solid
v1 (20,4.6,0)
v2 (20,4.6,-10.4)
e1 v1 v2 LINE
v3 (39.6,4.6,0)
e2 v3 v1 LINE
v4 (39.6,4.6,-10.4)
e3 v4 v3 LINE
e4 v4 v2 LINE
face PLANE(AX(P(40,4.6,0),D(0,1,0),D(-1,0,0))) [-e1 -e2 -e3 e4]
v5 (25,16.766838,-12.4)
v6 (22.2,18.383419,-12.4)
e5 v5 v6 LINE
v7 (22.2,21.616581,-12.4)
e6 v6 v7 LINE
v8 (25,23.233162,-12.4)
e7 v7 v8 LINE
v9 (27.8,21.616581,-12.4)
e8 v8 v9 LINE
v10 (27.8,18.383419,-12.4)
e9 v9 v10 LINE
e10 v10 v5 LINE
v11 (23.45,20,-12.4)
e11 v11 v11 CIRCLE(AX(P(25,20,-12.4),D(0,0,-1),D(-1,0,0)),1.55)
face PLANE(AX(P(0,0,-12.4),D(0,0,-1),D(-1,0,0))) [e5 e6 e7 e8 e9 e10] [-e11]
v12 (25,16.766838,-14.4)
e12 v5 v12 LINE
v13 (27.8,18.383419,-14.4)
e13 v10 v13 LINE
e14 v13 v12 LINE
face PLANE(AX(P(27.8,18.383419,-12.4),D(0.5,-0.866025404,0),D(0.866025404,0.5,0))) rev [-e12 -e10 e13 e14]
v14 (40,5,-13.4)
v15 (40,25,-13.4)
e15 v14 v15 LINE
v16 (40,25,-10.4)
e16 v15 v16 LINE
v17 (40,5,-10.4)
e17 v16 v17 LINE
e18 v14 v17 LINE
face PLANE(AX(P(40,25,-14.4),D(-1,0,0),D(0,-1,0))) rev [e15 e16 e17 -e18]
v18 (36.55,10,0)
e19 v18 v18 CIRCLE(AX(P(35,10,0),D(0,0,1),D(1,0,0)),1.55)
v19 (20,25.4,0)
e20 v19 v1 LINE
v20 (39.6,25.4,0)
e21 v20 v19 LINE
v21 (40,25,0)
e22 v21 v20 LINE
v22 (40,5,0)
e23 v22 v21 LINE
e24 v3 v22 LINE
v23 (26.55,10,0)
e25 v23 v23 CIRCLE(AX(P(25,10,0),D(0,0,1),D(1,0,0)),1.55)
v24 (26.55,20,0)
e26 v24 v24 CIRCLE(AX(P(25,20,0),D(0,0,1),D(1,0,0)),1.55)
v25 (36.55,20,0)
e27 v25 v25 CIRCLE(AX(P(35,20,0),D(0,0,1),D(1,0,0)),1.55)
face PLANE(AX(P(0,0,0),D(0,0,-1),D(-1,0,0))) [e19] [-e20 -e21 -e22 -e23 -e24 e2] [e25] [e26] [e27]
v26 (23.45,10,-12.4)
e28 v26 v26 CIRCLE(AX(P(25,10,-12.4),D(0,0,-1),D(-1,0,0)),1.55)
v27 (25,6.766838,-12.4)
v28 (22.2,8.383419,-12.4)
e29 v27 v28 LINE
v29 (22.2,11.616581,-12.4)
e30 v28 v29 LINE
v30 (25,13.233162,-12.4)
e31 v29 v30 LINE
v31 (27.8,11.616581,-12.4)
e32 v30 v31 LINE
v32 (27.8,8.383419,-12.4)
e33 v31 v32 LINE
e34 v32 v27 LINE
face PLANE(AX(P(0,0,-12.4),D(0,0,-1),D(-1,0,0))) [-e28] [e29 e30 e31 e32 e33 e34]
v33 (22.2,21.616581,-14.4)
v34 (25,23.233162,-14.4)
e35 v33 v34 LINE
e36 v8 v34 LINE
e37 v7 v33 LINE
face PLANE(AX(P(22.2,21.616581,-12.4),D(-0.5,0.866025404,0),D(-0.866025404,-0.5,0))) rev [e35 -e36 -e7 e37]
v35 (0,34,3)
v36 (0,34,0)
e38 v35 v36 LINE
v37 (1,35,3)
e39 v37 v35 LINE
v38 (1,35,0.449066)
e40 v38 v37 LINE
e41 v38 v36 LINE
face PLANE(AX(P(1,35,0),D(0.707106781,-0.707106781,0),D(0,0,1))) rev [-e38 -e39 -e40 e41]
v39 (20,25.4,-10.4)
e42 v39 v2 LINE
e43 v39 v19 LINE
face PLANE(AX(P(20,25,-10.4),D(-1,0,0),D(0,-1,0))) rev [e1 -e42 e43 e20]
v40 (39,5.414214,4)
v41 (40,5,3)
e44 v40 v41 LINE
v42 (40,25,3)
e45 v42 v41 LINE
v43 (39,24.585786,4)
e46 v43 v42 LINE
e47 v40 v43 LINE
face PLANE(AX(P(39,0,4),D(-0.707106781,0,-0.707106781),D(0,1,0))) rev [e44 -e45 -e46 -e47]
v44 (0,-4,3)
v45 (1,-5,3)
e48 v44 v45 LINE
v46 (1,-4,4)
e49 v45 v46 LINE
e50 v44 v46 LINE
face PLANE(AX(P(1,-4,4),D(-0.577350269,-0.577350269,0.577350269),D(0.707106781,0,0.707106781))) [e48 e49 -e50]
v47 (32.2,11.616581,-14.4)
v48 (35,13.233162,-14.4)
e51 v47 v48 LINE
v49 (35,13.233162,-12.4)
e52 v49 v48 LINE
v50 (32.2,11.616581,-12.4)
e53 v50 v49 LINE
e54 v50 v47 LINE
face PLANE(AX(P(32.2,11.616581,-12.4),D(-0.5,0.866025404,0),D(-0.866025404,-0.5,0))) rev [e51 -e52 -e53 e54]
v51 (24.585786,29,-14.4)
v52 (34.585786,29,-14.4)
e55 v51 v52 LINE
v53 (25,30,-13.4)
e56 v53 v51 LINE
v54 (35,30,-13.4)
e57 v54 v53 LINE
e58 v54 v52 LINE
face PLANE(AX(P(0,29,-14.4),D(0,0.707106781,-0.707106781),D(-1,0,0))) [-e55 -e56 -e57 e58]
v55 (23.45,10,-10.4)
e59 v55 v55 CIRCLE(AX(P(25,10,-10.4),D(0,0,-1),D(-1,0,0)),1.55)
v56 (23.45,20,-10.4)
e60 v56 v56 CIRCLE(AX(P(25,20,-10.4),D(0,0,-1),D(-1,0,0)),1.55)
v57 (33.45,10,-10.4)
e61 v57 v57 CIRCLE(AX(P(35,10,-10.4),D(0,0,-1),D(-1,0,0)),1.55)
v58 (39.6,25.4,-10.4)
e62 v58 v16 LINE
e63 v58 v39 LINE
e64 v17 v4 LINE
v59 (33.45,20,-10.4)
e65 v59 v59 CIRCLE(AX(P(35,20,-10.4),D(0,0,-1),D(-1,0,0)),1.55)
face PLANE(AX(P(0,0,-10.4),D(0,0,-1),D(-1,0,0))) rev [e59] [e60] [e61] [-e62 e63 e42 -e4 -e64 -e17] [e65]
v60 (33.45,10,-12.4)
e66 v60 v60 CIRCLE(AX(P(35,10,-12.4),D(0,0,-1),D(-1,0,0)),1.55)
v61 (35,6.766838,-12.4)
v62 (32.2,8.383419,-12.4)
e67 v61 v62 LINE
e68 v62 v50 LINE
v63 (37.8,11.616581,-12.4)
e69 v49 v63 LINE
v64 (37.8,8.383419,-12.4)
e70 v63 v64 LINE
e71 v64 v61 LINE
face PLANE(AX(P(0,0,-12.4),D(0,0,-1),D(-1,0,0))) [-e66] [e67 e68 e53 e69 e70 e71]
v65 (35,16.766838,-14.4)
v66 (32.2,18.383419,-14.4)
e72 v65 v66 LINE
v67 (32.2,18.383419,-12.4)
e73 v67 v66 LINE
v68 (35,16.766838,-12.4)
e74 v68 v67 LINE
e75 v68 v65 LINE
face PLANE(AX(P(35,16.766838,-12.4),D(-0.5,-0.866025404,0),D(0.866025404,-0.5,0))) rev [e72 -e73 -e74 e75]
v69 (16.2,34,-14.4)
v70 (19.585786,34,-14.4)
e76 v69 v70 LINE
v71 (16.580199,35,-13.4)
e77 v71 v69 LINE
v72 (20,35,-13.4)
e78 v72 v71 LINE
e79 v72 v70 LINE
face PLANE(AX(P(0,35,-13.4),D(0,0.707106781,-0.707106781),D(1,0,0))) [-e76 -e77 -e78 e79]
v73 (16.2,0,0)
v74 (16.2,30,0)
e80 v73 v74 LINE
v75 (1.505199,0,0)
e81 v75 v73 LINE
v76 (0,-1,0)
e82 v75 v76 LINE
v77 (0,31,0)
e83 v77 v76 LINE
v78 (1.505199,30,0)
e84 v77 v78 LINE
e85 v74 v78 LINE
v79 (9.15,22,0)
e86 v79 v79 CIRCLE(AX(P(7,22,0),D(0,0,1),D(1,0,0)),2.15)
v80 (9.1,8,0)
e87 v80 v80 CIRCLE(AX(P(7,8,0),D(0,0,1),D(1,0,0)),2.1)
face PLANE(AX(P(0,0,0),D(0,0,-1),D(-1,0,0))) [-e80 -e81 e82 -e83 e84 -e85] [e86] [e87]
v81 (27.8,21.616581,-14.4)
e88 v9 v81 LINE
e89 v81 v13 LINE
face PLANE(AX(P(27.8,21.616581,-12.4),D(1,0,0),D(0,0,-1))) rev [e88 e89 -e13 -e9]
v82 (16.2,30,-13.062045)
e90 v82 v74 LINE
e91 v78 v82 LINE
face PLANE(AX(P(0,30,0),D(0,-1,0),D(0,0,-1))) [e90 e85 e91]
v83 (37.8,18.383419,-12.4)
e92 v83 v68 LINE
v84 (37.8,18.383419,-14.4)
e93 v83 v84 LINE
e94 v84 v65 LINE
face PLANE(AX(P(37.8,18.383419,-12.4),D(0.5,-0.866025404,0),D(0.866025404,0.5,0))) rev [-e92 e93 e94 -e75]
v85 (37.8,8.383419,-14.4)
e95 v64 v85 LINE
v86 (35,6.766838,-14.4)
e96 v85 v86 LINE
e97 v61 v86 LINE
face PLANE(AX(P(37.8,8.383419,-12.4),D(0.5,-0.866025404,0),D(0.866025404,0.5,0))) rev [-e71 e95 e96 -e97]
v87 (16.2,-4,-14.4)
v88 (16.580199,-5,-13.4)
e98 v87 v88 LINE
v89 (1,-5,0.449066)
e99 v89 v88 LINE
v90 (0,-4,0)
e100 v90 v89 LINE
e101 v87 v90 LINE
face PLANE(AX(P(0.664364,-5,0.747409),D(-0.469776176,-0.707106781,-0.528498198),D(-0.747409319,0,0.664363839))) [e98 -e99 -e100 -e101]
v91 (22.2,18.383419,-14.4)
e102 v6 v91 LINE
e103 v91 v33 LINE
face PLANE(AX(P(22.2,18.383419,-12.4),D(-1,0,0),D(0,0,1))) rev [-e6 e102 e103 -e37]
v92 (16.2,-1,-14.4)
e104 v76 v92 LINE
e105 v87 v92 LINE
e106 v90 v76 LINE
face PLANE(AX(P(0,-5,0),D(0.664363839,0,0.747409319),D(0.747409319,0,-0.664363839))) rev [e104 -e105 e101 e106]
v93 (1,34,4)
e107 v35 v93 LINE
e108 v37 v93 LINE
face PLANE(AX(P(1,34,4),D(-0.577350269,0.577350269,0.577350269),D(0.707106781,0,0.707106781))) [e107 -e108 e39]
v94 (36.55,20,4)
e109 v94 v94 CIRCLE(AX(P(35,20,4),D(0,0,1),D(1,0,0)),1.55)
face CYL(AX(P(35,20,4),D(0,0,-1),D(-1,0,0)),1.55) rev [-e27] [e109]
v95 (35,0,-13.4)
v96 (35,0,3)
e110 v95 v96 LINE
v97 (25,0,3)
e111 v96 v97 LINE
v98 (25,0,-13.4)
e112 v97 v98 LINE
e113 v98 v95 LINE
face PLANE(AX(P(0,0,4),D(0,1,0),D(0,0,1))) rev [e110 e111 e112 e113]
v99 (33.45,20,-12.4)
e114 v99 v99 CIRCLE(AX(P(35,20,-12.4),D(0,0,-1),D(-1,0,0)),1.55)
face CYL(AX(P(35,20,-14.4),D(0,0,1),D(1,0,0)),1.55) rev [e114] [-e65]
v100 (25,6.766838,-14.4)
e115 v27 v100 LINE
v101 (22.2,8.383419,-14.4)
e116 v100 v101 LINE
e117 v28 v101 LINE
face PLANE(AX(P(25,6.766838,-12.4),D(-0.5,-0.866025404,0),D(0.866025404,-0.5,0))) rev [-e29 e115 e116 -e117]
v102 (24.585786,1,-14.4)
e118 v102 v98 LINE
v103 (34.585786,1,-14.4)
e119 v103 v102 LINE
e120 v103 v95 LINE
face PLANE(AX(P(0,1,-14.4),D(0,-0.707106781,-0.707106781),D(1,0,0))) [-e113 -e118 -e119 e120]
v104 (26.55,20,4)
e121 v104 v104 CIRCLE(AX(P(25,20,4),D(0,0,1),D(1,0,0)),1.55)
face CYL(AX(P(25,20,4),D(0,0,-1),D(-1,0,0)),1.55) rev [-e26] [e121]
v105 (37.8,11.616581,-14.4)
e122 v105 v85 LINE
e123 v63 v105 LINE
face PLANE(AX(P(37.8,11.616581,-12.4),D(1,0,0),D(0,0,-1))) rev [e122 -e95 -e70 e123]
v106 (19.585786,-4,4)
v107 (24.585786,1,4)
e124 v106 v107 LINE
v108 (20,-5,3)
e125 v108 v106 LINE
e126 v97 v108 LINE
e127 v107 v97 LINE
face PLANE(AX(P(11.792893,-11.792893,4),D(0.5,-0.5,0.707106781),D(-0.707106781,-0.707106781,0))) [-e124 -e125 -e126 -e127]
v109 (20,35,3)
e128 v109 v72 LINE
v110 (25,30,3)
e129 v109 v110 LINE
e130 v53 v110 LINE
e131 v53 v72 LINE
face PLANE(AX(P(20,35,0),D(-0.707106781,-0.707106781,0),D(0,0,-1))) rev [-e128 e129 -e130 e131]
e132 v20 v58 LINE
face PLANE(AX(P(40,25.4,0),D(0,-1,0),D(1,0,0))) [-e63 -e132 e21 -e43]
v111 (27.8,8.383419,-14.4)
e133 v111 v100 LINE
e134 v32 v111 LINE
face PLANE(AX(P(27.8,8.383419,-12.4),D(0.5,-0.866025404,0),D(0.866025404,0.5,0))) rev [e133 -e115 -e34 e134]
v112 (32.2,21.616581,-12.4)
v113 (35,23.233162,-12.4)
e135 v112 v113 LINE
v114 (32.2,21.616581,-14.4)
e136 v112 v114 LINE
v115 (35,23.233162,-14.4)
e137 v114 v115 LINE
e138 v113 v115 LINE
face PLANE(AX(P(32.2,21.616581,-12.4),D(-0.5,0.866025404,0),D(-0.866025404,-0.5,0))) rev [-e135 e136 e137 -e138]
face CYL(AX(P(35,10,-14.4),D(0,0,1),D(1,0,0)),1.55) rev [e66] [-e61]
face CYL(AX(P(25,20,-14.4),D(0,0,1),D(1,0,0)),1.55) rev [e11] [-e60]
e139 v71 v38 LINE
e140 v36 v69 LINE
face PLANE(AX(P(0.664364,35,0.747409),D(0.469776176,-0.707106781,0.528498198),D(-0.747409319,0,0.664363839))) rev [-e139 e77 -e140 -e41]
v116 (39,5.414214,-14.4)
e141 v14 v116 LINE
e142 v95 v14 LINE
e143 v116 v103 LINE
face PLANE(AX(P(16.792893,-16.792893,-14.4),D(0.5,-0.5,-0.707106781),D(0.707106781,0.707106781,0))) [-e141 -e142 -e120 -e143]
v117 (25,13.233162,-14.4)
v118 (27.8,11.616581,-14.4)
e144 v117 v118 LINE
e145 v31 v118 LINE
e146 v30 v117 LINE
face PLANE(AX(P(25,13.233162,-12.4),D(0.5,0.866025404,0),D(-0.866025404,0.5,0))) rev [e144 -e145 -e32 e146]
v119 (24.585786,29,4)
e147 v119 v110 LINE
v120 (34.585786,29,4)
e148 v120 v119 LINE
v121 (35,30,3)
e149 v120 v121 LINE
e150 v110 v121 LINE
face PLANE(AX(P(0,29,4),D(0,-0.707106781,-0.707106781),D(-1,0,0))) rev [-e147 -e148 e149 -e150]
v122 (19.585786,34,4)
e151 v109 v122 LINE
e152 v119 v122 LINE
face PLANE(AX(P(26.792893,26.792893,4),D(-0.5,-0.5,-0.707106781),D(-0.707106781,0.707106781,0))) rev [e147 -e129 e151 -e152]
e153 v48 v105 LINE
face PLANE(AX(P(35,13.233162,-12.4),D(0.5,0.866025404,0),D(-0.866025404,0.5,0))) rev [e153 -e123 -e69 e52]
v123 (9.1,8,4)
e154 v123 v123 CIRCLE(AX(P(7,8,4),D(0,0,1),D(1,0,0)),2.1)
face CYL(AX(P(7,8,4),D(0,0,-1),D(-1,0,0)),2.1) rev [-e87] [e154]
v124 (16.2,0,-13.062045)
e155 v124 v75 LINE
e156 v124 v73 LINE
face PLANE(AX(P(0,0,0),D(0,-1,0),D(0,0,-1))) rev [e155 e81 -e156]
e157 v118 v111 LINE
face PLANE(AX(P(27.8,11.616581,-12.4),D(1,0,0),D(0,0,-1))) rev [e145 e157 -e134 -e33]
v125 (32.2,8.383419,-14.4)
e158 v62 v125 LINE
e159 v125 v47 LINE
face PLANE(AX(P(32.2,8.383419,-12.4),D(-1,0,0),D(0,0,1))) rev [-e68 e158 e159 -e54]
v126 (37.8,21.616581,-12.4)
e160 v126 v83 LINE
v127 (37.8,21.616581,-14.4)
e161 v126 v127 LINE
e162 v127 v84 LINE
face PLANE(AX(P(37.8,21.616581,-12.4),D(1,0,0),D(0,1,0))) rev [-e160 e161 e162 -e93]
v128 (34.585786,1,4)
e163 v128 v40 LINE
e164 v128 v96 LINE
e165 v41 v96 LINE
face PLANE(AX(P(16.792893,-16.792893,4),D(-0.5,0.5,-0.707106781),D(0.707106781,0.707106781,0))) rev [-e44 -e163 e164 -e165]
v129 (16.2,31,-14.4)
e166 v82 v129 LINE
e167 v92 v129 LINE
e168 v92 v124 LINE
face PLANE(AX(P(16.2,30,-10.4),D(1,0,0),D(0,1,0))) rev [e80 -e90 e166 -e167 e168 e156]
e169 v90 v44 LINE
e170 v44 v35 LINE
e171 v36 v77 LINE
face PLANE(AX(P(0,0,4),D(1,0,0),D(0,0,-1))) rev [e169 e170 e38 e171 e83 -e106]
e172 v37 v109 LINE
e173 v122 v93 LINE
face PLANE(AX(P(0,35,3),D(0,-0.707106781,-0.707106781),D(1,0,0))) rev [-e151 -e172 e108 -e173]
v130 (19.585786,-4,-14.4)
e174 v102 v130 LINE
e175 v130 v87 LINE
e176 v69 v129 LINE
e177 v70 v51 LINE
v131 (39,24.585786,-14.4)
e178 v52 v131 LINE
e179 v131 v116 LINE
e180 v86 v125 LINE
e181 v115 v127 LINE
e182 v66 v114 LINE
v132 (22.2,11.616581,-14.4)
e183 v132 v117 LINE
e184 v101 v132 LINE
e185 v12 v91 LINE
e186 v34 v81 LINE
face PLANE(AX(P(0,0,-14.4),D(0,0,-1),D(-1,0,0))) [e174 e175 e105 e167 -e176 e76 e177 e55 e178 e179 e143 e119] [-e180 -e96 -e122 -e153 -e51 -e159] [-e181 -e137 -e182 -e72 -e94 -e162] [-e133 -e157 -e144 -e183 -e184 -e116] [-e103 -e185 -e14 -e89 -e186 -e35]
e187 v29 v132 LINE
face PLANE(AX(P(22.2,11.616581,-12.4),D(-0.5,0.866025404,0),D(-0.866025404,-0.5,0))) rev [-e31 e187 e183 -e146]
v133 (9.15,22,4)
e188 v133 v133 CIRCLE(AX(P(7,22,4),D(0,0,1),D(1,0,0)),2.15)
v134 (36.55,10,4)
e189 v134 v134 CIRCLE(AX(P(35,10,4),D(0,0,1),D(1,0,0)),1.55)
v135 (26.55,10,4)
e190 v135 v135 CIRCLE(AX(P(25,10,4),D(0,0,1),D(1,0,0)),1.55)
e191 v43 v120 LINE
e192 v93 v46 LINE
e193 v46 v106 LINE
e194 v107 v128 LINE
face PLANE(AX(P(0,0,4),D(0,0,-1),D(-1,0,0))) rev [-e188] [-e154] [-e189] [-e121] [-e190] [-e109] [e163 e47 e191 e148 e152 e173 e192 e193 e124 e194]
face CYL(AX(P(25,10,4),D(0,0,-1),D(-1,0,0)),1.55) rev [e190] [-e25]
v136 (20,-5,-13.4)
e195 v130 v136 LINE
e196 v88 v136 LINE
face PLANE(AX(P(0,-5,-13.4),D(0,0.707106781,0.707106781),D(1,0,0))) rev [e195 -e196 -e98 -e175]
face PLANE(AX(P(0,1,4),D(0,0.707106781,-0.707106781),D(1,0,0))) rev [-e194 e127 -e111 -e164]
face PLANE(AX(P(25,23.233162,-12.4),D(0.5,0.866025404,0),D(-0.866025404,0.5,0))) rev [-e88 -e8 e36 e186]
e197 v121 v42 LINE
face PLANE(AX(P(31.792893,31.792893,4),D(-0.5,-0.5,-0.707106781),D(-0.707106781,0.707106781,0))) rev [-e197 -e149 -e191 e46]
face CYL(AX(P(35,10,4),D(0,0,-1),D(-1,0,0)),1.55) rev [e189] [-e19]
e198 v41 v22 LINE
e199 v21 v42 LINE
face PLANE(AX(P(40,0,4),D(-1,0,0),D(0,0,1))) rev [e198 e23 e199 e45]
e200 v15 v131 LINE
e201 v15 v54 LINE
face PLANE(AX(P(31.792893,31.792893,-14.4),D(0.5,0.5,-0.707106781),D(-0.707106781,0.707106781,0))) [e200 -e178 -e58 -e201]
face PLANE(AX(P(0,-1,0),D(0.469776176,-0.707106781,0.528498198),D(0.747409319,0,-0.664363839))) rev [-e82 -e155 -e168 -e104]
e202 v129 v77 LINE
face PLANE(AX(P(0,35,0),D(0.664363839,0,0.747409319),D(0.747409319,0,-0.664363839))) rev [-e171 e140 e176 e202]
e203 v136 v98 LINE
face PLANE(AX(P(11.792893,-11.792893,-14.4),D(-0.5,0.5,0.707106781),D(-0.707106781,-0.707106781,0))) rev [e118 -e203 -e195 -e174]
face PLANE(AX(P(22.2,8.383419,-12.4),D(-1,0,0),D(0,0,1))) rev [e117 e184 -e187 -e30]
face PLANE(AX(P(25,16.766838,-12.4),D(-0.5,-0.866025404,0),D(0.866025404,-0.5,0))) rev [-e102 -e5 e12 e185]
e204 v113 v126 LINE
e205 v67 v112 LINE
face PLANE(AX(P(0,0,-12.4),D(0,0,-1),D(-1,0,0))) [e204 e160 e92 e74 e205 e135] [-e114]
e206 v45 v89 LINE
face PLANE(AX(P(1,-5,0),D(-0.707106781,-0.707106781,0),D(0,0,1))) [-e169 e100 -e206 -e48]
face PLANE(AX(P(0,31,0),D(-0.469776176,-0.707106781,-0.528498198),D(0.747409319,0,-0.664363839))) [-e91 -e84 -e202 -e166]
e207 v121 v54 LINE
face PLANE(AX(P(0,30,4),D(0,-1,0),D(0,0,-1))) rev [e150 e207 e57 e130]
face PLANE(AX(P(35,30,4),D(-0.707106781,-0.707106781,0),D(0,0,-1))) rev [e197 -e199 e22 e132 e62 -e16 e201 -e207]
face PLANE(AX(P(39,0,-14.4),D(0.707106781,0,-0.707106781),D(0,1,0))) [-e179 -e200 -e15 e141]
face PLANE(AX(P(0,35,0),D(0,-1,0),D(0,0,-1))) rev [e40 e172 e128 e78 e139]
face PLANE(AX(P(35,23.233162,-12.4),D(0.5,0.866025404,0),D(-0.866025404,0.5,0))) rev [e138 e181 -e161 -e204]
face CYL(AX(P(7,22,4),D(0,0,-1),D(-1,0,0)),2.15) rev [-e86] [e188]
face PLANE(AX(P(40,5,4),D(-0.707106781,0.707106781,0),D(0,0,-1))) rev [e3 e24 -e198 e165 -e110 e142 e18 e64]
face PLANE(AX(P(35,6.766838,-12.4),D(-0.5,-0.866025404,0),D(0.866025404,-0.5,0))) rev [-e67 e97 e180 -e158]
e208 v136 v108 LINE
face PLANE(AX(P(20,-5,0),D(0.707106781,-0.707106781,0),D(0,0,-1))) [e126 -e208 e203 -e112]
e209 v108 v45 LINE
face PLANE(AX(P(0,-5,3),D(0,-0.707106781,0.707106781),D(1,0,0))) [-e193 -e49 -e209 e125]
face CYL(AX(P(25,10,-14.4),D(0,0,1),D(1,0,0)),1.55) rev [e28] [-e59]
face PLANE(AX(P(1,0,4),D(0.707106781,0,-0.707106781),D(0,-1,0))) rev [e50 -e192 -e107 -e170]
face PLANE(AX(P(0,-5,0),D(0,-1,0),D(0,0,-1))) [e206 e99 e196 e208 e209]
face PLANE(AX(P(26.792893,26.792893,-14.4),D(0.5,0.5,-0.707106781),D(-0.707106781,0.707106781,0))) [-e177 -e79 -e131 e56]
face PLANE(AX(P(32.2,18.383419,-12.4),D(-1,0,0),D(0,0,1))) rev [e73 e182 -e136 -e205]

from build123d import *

# Parameters (mm, degrees)
SKETCH_1_W          = 40
SKETCH_1_H          = 30
SKETCH_1_R          = 2.15
SKETCH_1_R_2        = 2.1
SKETCH_1_R_3        = 1.55
EXTRUDE_1_DEPTH     = 4
CHAMFER_1_SIZE      = 5
EXTRUDE_2_DEPTH     = 10.4
EXTRUDE_START       = 4
SKETCH_4_R          = 1.55
EXTRUDE_3_DEPTH     = 4
EXTRUDE_4_DEPTH     = 5
EXTRUDE_5_DEPTH     = 5
CHAMFER_3_SIZE      = 10
CHAMFER_4_SIZE      = 1
CUT_EXTRUDE_1_DEPTH = 2
SKETCH_10_W         = 10.4
SKETCH_10_H         = 20.8
CUT_EXTRUDE_2_DEPTH = 43.806074335


with BuildPart() as part:
    # 草图1 → 凸台-拉伸1 (new body)
    with BuildSketch(Plane.XY):
        with Locations((20, 15)):
            Rectangle(SKETCH_1_W, SKETCH_1_H)
        with Locations((7, 22)):
            Circle(SKETCH_1_R, mode=Mode.SUBTRACT)
        with Locations((7, 8)):
            Circle(SKETCH_1_R_2, mode=Mode.SUBTRACT)
        with Locations((35, 20)):
            Circle(SKETCH_1_R_3, mode=Mode.SUBTRACT)
        with Locations((25, 20)):
            Circle(SKETCH_1_R_3, mode=Mode.SUBTRACT)
        with Locations((25, 10)):
            Circle(SKETCH_1_R_3, mode=Mode.SUBTRACT)
        with Locations((35, 10)):
            Circle(SKETCH_1_R_3, mode=Mode.SUBTRACT)
    extrude(amount=EXTRUDE_1_DEPTH)

    # 倒角1
    chamfer_1_edges = [part.edges().sort_by_distance(p)[0] for p in [
        (40, 30, 2),
        (40, 0, 2),
    ]]
    chamfer(chamfer_1_edges, length=CHAMFER_1_SIZE)

    # 草图3 → 凸台-拉伸2 (add)
    with BuildSketch(Plane(origin=(0, 0, 0), x_dir=(-1, 0, 0), z_dir=(0, 0, -1))):
        Polygon((-40, 25), (-20, 25), (-20, 5), (-40, 5), (-35, 0), (-16.2, 0), (-16.2, 30), (-35, 30), align=None)
    extrude(amount=EXTRUDE_2_DEPTH)

    # 草图4 → 凸台-拉伸3 (add)
    with BuildSketch(Plane(origin=(0, 0, -10.4), x_dir=(-1, 0, 0), z_dir=(0, 0, -1)).offset(EXTRUDE_START)):
        Polygon((-40, 25), (-40, 5), (-35, 0), (-16.2, 0), (-16.2, 30), (-35, 30), align=None)
        with Locations(Location((-35, 20, 0), (0, 0, 180))):
            Circle(SKETCH_4_R, mode=Mode.SUBTRACT)
        with Locations(Location((-25, 20, 0), (0, 0, 180))):
            Circle(SKETCH_4_R, mode=Mode.SUBTRACT)
        with Locations(Location((-25, 10, 0), (0, 0, 180))):
            Circle(SKETCH_4_R, mode=Mode.SUBTRACT)
        with Locations(Location((-35, 10, 0), (0, 0, 180))):
            Circle(SKETCH_4_R, mode=Mode.SUBTRACT)
    extrude(amount=-EXTRUDE_3_DEPTH)

    # 草图7 → 凸台-拉伸4 (add)
    with BuildSketch(Plane.XZ):
        Polygon((0, 0), (16.2, -14.4), (30, -14.4), (30, 4), (0, 4), align=None)
    extrude(amount=EXTRUDE_4_DEPTH)

    # 草图8 → 凸台-拉伸5 (add)
    with BuildSketch(Plane(origin=(0, 30, 0), x_dir=(1, 0, 0), z_dir=(0, 1, 0))):
        Polygon((0, 0), (16.2, 14.4), (30, 14.4), (30, -4), (0, -4), align=None)
    extrude(amount=EXTRUDE_5_DEPTH)

    # 倒角3
    # the kernel refuses this chamfer: 10 mm, written as the material it takes off along each edge
    with BuildSketch(Plane(origin=(30, 35, -40.11682988), x_dir=(-0.9996219169112968, 0.027495876610586317, 0), z_dir=(0, 0, 1))) as chamfer_3_piece_1_section:
        Polygon((CHAMFER_3_SIZE * 0.999621916911, CHAMFER_3_SIZE * 0.0274958766106), (-CHAMFER_3_SIZE * 0.0274958766106, CHAMFER_3_SIZE * 0.999621916911), (0, 0), align=None)
    chamfer_3_piece_1 = extrude(amount=69.833659759, mode=Mode.PRIVATE)
    chamfer_3_piece_1 = split(chamfer_3_piece_1, bisect_by=Plane(origin=(26.065989159, 30, -5.2), z_dir=(0, 1, 0)), keep=Keep.TOP, mode=Mode.PRIVATE)
    add(chamfer_3_piece_1, mode=Mode.SUBTRACT)
    with BuildSketch(Plane(origin=(30, -5, -40.11682988), x_dir=(-0.9996219169112968, -0.027495876610586403, 0), z_dir=(0, 0, 1))) as chamfer_3_piece_2_section:
        Polygon((CHAMFER_3_SIZE * 0.999621916911, -CHAMFER_3_SIZE * 0.0274958766106), (-CHAMFER_3_SIZE * 0.0274958766106, -CHAMFER_3_SIZE * 0.999621916911), (0, 0), align=None)
    chamfer_3_piece_2 = extrude(amount=69.833659759, mode=Mode.PRIVATE)
    chamfer_3_piece_2 = split(chamfer_3_piece_2, bisect_by=Plane(origin=(26.065989159, 0, -5.2), z_dir=(0, -1, 0)), keep=Keep.TOP, mode=Mode.PRIVATE)
    add(chamfer_3_piece_2, mode=Mode.SUBTRACT)

    # 倒角4
    chamfer_4_edges = [part.edges().sort_by_distance(p)[0] for p in [
        (30, 0, 4),
        (8.1, 0, -7.2),
        (0, -5, 2),
        (8.1, -5, -7.2),
        (18.1, -5, -14.4),
        (30, 30, -14.4),
        (8.1, 30, -7.2),
        (8.1, 35, -7.2),
        (0, 35, 2),
        (10, 35, 4),
        (18.1, 35, -14.4),
        (22.5, -2.5, -14.4),
        (22.5, 32.5, -14.4),
        (10, -5, 4),
        (22.5, -2.5, 4),
        (22.5, 32.5, 4),
        (40, 15, 4),
        (30, 30, 4),
        (37.5, 27.5, 4),
        (37.5, 2.5, 4),
        (0, 15, 4),
        (37.5, 27.5, -14.4),
        (40, 15, -14.4),
        (37.5, 2.5, -14.4),
        (30, 0, -14.4),
    ]]
    chamfer(chamfer_4_edges, length=CHAMFER_4_SIZE)

    # 草图9 → 切除-拉伸1 (cut)
    with BuildSketch(Plane(origin=(0, 0, -14.4), x_dir=(-1, 0, 0), z_dir=(0, 0, -1))):
        Polygon((-35, 16.766838493), (-32.2, 18.383419246), (-32.2, 21.616580754), (-35, 23.233161507), (-37.8, 21.616580754), (-37.8, 18.383419246), align=None)
        Polygon((26.245937902, 18.719863705), (29.045937902, 20.336444458), (29.045937902, 23.569605966), (26.245937902, 25.186186719), (23.445937902, 23.569605966), (23.445937902, 20.336444458), align=None)
        Polygon((-35, 6.766838493), (-32.2, 8.383419246), (-32.2, 11.616580754), (-35, 13.233161507), (-37.8, 11.616580754), (-37.8, 8.383419246), align=None)
        Polygon((-25, 6.766838493), (-22.2, 8.383419246), (-22.2, 11.616580754), (-25, 13.233161507), (-27.8, 11.616580754), (-27.8, 8.383419246), align=None)
        Polygon((-25, 16.766838493), (-22.2, 18.383419246), (-22.2, 21.616580754), (-25, 23.233161507), (-27.8, 21.616580754), (-27.8, 18.383419246), align=None)
    extrude(amount=-CUT_EXTRUDE_1_DEPTH, mode=Mode.SUBTRACT)

    # 草图10 → 切除-拉伸2 (cut, through all)
    with BuildSketch(Plane(origin=(20, 0, 0), x_dir=(0, 0, -1), z_dir=(1, 0, 0))):
        with Locations((5.2, 15)):
            Rectangle(SKETCH_10_W, SKETCH_10_H)
    extrude(amount=CUT_EXTRUDE_2_DEPTH, mode=Mode.SUBTRACT)


solid = part.part
